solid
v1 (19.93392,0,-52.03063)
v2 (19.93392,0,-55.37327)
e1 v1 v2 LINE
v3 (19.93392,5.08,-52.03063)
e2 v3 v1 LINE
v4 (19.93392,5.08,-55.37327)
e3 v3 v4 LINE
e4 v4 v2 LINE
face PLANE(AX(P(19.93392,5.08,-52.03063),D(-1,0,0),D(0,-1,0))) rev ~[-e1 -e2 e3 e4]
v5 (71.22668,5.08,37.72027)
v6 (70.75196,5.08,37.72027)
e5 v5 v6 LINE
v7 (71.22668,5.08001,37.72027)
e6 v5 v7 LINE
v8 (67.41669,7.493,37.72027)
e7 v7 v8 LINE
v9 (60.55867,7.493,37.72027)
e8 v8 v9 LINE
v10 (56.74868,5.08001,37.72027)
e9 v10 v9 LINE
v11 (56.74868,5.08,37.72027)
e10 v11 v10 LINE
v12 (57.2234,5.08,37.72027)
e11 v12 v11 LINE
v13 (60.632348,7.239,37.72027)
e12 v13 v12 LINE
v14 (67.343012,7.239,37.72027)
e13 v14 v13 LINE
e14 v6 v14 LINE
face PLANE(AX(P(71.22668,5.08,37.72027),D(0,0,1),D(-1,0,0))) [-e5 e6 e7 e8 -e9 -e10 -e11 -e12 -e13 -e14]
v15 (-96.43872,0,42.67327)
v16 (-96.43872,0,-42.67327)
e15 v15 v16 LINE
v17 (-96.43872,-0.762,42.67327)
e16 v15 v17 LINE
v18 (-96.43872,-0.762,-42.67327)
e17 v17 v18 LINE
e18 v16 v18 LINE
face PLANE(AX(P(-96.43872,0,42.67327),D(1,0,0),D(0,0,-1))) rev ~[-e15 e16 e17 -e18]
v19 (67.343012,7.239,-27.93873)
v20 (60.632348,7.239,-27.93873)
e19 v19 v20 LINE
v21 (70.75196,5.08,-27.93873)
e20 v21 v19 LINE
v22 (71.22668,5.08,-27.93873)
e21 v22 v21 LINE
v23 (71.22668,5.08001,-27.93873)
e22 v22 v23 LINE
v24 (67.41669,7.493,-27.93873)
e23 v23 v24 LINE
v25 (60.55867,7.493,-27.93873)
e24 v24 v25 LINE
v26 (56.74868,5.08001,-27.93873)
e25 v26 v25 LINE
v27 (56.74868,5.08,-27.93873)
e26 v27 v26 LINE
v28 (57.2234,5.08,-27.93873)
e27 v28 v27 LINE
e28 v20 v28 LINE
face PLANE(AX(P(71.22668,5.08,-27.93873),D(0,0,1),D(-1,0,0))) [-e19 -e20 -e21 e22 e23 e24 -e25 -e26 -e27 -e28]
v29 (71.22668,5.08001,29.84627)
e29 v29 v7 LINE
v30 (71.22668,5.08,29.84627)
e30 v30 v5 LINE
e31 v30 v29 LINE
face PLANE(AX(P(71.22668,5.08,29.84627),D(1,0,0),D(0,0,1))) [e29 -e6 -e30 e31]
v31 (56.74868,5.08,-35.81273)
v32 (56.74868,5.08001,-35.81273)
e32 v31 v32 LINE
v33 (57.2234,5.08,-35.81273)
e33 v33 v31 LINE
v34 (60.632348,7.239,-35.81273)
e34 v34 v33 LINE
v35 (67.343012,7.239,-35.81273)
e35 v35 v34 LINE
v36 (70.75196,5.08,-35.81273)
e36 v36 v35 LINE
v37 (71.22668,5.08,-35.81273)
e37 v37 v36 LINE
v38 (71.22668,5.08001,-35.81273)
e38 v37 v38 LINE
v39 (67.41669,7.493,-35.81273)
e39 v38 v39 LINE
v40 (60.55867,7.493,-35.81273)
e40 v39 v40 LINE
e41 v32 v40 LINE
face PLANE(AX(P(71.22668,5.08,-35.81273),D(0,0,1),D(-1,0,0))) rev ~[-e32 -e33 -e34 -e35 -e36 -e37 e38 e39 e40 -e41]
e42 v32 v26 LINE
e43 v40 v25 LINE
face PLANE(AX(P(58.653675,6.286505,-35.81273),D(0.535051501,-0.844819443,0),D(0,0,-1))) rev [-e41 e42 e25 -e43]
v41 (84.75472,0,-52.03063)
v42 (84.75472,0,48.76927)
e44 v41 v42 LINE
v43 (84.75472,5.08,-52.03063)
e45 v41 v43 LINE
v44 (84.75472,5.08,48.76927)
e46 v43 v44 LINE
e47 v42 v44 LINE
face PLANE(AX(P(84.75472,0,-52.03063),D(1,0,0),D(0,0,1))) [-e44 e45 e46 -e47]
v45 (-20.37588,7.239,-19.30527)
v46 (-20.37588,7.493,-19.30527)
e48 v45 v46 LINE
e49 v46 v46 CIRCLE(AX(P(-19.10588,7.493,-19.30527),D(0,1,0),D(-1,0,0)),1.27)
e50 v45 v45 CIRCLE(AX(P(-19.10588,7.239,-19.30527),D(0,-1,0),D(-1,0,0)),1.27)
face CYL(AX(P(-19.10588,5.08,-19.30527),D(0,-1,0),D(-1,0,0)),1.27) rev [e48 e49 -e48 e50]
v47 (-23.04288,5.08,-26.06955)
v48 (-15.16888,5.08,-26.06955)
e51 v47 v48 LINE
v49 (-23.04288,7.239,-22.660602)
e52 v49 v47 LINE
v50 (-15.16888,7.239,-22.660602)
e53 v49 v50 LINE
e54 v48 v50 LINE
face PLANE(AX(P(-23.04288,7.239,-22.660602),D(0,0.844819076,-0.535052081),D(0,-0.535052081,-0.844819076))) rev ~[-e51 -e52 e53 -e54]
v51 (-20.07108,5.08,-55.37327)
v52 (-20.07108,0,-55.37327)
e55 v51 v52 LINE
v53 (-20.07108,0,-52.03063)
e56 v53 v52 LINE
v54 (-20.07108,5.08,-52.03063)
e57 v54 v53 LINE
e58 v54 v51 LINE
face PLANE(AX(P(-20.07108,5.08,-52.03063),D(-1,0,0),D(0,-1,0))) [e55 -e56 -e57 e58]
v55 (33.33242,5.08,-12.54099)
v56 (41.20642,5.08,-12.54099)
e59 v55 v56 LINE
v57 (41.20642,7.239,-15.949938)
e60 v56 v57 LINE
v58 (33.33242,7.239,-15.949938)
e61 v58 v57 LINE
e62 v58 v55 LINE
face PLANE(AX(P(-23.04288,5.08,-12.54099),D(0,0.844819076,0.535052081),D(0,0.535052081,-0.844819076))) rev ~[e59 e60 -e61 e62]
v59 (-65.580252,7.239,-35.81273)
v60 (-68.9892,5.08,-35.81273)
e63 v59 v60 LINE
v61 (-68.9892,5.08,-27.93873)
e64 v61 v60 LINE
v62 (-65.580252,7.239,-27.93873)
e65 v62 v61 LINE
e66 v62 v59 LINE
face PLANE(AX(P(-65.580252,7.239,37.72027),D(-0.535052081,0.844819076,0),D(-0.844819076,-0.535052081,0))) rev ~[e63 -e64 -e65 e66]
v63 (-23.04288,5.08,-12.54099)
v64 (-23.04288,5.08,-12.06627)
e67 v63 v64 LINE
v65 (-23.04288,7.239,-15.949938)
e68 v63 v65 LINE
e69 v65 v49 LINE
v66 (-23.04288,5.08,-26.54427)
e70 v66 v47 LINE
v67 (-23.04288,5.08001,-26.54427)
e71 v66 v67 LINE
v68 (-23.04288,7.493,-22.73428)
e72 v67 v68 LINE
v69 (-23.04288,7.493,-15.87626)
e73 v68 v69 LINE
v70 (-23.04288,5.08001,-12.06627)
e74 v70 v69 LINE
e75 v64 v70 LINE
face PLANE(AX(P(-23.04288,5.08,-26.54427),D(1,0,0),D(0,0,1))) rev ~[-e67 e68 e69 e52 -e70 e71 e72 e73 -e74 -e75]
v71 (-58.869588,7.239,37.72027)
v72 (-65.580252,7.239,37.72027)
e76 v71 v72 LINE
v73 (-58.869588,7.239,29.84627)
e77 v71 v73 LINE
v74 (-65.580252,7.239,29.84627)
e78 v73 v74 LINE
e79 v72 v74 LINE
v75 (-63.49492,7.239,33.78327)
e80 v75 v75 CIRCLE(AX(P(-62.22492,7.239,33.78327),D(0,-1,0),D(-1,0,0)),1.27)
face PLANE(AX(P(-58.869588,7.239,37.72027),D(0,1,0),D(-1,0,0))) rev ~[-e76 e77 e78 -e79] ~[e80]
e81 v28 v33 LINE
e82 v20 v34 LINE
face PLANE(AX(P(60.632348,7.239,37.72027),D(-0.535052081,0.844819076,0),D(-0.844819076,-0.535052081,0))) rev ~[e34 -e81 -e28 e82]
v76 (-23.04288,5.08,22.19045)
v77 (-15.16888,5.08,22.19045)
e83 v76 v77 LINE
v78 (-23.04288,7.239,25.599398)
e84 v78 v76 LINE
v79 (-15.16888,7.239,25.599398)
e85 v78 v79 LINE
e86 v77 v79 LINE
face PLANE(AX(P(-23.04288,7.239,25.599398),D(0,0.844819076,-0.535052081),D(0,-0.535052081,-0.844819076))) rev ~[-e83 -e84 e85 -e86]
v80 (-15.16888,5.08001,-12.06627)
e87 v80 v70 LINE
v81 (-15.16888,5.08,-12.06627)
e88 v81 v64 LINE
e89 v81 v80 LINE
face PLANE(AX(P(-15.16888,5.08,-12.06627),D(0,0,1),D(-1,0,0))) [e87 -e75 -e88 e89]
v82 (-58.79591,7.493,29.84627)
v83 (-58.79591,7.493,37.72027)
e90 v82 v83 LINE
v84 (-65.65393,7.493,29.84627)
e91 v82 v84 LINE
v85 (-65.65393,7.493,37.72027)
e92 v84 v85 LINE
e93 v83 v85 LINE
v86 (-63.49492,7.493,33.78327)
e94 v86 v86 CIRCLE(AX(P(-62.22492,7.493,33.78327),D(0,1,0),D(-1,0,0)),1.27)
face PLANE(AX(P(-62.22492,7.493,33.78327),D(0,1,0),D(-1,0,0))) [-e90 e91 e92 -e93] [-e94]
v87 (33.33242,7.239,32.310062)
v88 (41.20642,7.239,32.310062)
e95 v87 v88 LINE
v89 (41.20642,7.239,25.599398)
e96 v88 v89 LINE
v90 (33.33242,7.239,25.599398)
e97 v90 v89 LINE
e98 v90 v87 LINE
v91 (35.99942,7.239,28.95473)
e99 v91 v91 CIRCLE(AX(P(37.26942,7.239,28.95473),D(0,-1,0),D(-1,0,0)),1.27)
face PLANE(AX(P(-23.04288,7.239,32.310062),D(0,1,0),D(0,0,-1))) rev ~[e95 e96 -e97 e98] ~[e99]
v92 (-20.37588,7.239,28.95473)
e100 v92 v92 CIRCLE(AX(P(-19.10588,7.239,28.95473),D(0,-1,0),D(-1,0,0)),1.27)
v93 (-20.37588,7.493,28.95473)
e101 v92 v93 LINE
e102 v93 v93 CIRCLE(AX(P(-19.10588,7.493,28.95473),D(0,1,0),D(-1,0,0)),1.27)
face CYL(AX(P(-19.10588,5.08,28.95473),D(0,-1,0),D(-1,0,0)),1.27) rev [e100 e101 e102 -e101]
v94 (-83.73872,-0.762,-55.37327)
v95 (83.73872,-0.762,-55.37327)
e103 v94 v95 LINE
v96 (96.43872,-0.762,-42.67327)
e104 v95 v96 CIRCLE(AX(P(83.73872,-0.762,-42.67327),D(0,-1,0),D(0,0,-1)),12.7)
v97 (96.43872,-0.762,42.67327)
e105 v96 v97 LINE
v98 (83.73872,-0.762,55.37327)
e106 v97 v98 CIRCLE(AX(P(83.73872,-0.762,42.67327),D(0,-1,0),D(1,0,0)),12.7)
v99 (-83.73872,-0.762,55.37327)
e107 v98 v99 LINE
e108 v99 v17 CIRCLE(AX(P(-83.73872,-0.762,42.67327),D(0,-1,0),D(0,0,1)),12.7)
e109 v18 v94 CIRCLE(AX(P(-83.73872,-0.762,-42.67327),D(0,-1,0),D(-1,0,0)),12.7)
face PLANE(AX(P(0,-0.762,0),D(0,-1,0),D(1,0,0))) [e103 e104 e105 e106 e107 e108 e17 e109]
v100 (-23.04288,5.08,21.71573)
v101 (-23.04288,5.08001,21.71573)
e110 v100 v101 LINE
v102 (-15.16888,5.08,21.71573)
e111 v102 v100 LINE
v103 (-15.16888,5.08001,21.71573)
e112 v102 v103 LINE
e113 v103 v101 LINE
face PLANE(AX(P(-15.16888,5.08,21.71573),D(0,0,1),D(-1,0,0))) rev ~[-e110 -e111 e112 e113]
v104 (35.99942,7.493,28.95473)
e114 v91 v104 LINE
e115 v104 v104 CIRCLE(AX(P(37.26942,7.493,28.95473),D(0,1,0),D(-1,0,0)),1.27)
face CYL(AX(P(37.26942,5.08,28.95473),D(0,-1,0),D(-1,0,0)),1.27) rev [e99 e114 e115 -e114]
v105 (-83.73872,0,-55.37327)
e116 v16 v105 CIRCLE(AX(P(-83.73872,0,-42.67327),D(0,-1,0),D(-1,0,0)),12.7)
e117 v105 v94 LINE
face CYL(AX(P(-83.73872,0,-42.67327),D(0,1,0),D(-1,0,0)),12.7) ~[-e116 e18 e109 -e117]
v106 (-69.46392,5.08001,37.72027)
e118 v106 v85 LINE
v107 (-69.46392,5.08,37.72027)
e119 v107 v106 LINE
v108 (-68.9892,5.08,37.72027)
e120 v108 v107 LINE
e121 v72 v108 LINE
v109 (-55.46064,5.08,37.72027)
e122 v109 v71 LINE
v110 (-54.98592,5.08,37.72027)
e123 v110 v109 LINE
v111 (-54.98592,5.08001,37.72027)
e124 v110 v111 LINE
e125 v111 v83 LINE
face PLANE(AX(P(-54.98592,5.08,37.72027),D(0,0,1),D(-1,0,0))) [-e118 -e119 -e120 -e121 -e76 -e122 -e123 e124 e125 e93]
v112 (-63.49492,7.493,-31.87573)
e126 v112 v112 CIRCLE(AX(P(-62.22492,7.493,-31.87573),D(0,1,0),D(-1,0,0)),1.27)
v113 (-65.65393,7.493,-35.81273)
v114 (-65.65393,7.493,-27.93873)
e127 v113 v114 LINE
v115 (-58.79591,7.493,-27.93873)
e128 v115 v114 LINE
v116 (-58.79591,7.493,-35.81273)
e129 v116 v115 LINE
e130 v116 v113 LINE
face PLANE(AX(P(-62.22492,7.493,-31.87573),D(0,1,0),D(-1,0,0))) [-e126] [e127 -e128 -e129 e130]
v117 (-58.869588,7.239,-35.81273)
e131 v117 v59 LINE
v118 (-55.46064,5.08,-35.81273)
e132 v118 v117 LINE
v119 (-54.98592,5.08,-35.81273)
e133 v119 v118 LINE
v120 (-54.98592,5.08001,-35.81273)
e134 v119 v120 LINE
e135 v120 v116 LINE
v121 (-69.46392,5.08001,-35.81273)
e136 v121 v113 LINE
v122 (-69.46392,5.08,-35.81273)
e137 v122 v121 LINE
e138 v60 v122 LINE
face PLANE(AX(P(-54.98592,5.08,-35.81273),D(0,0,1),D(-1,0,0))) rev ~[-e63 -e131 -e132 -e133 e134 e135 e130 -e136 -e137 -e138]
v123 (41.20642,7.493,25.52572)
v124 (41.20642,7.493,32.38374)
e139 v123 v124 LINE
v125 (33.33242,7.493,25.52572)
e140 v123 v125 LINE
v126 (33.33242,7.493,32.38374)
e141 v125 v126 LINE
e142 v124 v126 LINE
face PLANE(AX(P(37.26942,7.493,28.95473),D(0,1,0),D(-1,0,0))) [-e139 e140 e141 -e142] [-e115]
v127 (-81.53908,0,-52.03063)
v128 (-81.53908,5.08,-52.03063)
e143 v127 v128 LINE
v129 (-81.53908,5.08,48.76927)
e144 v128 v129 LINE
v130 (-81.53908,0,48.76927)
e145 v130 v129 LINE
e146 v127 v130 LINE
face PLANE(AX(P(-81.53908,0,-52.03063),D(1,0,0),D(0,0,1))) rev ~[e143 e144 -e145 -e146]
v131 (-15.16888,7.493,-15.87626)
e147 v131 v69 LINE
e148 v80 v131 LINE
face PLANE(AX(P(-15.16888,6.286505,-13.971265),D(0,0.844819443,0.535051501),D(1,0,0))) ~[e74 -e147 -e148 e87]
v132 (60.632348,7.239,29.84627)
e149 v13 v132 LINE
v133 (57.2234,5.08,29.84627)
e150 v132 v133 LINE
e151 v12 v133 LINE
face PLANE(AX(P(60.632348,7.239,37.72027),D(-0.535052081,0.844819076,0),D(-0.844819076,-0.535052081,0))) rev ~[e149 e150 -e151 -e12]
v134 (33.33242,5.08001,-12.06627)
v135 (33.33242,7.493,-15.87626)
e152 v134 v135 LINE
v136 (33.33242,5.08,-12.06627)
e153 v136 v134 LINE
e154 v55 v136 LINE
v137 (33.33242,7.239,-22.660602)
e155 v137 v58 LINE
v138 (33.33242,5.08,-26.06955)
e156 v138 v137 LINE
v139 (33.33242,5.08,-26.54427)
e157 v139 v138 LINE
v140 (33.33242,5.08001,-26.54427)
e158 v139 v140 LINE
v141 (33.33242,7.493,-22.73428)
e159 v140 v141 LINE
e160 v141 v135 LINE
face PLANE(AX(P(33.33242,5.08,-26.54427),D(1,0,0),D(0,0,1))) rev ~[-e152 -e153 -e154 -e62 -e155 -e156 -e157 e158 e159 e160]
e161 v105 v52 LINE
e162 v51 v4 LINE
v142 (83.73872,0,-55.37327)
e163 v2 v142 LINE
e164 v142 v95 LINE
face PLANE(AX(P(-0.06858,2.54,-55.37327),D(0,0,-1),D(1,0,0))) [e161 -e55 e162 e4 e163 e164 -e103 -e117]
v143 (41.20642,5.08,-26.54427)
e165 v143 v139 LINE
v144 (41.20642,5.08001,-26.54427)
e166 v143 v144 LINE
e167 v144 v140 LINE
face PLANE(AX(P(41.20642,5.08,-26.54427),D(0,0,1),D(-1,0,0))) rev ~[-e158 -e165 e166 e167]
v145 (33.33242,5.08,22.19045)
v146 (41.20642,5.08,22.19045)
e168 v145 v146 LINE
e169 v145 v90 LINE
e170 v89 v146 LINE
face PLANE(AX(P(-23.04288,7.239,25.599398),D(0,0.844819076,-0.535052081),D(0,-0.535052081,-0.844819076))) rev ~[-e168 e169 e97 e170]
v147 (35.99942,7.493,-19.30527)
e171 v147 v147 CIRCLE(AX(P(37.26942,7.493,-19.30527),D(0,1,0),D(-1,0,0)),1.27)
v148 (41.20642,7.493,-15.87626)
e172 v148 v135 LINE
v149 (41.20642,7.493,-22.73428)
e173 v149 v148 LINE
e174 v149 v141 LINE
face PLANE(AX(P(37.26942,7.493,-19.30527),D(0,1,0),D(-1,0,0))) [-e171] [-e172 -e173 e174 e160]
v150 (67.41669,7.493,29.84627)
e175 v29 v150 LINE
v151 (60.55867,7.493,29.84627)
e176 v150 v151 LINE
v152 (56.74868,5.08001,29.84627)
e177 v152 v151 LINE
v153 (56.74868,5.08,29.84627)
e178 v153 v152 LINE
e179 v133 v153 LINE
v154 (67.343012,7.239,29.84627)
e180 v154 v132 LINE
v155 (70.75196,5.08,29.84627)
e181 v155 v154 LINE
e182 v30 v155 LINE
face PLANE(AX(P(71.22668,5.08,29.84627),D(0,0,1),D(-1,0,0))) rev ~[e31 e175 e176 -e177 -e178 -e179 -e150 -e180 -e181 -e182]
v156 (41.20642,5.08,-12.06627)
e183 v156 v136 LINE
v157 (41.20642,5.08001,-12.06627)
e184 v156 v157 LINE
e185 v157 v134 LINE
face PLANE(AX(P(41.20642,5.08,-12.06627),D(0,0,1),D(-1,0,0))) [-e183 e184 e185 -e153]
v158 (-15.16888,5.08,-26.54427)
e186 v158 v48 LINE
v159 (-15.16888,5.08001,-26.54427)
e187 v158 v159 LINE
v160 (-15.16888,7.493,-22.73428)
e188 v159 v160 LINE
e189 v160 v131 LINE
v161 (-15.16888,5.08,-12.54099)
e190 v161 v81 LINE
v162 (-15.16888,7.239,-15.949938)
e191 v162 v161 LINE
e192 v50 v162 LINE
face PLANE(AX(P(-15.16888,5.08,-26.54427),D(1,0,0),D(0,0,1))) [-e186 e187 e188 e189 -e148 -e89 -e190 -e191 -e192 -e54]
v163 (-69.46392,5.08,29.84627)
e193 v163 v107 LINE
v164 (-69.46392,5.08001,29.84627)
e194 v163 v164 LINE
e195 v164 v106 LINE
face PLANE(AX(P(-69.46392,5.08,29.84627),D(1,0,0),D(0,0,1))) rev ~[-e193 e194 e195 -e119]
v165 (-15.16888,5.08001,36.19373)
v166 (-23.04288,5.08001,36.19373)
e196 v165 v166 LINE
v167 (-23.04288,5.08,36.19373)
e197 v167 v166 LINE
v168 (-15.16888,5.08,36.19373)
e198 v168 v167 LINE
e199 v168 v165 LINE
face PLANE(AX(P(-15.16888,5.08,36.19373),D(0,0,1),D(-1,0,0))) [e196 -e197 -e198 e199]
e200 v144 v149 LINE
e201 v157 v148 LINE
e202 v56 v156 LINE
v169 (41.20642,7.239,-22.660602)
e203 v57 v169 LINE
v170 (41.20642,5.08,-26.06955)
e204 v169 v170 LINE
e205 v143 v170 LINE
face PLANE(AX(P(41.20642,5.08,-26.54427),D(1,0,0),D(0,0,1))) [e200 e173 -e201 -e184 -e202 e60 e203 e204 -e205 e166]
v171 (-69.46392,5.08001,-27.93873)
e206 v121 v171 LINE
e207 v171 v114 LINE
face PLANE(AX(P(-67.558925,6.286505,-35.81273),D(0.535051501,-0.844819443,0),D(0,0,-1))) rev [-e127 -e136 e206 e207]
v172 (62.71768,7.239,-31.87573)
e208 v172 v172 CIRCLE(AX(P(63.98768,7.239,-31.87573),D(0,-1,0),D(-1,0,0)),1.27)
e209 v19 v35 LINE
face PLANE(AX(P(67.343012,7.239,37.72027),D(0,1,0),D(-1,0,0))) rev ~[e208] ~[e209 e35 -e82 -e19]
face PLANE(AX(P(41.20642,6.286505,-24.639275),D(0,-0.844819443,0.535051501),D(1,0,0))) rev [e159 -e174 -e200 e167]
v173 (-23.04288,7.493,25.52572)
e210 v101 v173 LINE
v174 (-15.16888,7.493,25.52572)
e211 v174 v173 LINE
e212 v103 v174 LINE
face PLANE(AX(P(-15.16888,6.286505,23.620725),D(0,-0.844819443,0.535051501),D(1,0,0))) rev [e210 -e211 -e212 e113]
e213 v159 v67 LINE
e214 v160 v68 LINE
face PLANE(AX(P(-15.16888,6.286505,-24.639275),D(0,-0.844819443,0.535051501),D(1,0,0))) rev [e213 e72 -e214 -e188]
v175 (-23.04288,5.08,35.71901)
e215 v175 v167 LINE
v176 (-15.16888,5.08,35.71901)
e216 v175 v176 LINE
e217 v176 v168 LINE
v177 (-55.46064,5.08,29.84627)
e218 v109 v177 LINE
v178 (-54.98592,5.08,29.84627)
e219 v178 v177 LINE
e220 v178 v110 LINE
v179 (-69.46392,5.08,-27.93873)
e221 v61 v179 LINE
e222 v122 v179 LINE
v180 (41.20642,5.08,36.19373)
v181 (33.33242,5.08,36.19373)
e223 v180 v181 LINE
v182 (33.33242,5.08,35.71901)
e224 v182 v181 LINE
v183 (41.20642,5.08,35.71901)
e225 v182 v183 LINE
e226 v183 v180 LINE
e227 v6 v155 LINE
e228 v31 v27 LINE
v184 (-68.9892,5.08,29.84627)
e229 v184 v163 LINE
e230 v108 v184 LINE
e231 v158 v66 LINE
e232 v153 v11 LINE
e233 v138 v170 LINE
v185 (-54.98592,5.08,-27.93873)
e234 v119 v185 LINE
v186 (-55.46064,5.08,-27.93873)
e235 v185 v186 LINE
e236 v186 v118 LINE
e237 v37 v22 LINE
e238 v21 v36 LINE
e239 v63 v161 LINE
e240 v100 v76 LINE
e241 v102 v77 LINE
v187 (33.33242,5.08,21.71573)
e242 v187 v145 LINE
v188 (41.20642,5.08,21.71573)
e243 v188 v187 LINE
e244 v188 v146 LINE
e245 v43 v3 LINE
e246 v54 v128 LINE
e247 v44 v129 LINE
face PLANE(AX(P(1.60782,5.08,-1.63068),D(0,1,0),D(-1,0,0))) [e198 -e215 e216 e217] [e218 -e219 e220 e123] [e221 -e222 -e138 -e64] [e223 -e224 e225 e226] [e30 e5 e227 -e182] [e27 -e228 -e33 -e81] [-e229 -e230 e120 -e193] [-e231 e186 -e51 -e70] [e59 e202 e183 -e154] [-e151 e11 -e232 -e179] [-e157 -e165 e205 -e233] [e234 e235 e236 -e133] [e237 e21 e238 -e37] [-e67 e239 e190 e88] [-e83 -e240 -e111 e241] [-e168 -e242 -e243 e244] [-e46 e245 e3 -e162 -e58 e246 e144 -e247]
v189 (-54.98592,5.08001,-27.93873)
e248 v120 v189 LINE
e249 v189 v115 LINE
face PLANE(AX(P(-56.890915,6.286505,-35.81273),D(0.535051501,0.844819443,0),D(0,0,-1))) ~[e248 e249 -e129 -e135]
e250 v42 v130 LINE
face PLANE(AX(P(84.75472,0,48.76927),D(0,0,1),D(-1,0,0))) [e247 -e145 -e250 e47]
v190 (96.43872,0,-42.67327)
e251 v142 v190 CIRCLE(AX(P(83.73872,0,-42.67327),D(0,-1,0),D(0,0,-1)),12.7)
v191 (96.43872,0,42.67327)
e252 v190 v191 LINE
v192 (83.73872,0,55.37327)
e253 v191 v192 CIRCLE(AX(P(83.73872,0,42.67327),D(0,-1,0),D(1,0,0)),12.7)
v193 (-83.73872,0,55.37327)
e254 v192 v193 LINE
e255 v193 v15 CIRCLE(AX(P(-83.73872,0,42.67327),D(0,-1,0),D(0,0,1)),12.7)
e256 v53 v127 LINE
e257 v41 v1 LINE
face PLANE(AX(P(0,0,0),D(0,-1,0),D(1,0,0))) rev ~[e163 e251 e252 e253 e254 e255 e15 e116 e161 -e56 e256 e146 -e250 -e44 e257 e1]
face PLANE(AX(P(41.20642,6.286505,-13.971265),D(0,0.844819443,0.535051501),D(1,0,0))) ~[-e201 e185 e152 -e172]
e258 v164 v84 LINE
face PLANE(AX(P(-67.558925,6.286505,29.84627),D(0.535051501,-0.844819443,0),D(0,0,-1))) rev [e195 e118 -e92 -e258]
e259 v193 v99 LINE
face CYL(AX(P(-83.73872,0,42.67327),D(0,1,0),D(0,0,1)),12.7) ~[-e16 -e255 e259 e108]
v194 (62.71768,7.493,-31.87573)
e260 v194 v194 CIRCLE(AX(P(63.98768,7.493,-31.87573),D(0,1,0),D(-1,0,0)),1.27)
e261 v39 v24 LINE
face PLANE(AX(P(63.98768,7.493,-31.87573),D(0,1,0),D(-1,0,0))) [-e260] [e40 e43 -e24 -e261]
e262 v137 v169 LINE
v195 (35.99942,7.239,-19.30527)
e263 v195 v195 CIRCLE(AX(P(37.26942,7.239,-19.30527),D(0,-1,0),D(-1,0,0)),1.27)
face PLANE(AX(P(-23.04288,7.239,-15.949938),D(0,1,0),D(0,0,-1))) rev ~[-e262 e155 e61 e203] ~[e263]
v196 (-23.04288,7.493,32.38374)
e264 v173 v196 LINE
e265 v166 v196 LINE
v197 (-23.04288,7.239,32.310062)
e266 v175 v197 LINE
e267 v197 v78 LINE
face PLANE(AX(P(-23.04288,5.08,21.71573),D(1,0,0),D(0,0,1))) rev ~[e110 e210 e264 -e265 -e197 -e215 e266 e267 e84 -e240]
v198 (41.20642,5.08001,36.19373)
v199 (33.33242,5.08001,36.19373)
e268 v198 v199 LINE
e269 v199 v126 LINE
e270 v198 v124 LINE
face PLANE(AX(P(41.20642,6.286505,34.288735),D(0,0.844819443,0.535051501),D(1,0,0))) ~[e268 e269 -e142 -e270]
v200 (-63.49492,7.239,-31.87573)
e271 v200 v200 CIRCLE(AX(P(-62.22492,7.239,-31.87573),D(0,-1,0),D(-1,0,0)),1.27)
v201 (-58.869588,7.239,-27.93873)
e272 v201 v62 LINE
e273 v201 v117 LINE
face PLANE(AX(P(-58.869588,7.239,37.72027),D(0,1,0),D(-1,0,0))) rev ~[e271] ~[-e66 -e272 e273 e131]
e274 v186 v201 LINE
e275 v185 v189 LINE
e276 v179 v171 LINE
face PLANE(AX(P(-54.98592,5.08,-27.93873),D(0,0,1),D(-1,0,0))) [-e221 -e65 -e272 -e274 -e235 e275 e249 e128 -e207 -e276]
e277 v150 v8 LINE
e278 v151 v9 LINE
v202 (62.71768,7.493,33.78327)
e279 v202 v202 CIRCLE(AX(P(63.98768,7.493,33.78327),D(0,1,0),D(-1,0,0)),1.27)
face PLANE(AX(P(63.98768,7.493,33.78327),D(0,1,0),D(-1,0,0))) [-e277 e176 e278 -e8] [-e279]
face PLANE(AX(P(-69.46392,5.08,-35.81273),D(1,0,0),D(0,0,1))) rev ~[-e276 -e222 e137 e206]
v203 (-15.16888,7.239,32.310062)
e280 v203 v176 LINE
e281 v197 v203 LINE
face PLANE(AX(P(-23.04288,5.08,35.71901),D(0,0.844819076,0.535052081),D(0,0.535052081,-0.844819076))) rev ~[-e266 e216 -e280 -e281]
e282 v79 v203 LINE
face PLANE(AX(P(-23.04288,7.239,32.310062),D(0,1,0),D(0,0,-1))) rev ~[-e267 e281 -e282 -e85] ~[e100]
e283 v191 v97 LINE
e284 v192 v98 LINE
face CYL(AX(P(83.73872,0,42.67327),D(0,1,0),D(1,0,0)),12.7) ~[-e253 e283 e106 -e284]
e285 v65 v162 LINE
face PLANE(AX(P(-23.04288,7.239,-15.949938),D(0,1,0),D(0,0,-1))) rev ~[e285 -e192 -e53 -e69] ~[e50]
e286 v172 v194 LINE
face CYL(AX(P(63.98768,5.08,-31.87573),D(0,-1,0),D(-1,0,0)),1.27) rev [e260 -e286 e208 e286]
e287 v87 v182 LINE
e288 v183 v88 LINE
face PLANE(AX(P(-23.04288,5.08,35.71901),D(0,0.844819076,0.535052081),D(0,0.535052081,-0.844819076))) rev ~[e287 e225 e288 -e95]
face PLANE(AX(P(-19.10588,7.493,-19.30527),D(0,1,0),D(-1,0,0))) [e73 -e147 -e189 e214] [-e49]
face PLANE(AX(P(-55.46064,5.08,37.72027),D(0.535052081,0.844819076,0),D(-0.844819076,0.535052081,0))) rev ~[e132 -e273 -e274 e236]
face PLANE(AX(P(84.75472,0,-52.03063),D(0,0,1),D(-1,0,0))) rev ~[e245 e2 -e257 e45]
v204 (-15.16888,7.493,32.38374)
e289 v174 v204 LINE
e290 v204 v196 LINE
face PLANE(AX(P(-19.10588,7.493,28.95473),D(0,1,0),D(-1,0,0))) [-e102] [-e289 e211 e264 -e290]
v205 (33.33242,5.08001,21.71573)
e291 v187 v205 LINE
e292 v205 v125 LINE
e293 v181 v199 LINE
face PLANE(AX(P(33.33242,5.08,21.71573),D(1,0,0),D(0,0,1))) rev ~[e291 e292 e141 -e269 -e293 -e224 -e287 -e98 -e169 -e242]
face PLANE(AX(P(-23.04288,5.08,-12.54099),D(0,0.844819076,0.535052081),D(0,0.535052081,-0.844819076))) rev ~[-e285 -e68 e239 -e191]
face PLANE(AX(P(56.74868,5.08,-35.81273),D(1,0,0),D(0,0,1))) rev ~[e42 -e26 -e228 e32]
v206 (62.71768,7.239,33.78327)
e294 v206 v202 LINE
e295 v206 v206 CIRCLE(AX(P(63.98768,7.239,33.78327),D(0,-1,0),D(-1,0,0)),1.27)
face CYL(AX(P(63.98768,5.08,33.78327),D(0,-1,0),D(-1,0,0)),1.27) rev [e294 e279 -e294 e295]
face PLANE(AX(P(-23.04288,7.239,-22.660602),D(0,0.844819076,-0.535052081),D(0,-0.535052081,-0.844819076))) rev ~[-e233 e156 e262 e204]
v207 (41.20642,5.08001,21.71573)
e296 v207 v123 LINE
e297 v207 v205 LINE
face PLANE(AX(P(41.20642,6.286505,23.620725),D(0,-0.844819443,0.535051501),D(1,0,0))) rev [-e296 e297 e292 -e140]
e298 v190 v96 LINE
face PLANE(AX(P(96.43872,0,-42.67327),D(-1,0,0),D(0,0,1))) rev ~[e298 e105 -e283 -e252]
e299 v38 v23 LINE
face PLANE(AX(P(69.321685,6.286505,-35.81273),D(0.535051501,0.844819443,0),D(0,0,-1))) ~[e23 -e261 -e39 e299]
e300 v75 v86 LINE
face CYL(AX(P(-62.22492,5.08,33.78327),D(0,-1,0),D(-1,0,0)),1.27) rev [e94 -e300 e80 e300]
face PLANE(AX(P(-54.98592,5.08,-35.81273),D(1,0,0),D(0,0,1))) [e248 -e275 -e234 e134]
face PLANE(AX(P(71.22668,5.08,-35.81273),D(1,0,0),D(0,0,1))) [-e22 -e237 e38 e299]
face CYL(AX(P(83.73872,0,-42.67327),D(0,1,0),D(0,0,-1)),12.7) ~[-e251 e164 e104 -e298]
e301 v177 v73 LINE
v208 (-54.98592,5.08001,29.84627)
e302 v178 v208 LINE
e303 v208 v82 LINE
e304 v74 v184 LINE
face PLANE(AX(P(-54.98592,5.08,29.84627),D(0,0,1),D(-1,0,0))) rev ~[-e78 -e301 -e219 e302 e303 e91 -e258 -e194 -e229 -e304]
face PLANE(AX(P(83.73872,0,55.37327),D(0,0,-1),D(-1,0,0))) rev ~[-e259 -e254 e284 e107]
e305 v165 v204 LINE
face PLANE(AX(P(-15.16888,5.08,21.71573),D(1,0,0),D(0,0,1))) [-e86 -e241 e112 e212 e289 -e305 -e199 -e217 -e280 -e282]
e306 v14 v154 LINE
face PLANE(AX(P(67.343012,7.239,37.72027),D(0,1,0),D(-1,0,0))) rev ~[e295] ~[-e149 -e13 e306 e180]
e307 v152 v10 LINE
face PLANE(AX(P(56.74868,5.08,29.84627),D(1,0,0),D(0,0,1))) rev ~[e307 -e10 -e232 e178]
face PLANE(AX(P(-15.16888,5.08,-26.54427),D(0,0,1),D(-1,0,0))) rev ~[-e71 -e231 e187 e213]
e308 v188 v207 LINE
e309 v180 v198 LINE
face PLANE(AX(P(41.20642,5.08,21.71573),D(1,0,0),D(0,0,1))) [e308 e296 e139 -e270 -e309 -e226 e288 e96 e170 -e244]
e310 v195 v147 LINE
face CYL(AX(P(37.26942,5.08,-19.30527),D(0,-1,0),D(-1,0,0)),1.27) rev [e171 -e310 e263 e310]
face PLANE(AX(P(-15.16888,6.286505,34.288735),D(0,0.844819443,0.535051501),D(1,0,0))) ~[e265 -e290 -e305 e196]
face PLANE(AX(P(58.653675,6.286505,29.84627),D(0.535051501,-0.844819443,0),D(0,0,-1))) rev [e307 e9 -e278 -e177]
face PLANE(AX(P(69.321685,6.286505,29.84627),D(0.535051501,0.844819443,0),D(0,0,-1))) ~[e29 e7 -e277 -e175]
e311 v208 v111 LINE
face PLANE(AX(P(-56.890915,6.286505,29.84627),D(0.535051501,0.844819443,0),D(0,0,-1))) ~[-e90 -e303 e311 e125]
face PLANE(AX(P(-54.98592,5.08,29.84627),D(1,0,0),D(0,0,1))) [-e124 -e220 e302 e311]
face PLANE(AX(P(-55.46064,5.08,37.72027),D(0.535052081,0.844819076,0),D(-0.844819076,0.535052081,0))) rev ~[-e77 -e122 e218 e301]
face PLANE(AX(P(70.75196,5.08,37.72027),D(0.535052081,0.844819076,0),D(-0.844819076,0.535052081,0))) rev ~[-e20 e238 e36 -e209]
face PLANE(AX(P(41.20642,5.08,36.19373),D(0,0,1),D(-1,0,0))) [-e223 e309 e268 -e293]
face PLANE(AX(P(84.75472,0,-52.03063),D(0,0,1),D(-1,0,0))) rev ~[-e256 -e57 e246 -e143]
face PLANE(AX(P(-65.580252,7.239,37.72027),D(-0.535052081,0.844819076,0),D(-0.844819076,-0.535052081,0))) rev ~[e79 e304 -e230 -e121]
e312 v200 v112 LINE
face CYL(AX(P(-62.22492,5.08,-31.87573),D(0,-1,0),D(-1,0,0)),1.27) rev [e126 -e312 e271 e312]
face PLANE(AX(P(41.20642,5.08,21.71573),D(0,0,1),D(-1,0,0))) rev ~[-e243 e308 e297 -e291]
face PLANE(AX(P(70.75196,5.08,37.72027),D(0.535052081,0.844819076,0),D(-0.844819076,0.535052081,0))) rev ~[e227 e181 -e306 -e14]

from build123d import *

# Parameters (mm, degrees)
F1_DEPTH   = 0.762
F2_W       = 166.2938
F2_H       = 100.7999
F3_DEPTH   = 5.08
F4_W       = 14.478
F4_H       = 7.874
F4_R       = 1.27
F4_W_2     = 7.874
F4_H_2     = 14.478
F5_DEPTH   = 2.413
F6_SIZE2   = 3.80999
F6_SIZE    = 2.41299
F6_2_SIZE2 = 3.80999
F6_2_SIZE  = 2.41299
F6_3_SIZE2 = 3.80999
F6_3_SIZE  = 2.41299
F6_4_SIZE2 = 3.80999
F6_4_SIZE  = 2.41299
F6_5_SIZE2 = 3.80999
F6_5_SIZE  = 2.41299
F6_6_SIZE2 = 3.80999
F6_6_SIZE  = 2.41299
F6_7_SIZE2 = 3.80999
F6_7_SIZE  = 2.41299
F6_8_SIZE2 = 3.80999
F6_8_SIZE  = 2.41299
F6_9_SIZE2 = 3.80999
F6_9_SIZE  = 2.41299
F7_SIZE2   = 3.80999
F7_SIZE    = 2.41299
F7_2_SIZE2 = 3.80999
F7_2_SIZE  = 2.41299
F7_3_SIZE2 = 3.80999
F7_3_SIZE  = 2.41299
F7_4_SIZE2 = 3.80999
F7_4_SIZE  = 2.41299
F7_5_SIZE2 = 3.80999
F7_5_SIZE  = 2.41299
F7_6_SIZE2 = 3.80999
F7_6_SIZE  = 2.41299
F7_7_SIZE2 = 3.80999
F7_7_SIZE  = 2.41299
F9_DEPTH   = 73.533
F11_DEPTH  = 64.2493
F12_W      = 40.005
F12_H      = 5.08
F13_DEPTH  = 3.34264


# Not quite as in the source:
# - a fillet or chamfer is up to 0.001 mm smaller than in the source, because OpenCascade refuses the exact size


with BuildPart() as f1:
    # F0 (on Front) → F1 (new body)
    with BuildSketch(Plane.XZ):
        with BuildLine():
            ThreePointArc((96.43872, 42.67327), (92.7189761211, 51.6535261211), (83.73872, 55.37327))
            Line((83.73872, 55.37327), (-83.73872, 55.37327))
            ThreePointArc((-83.73872, 55.37327), (-92.7189761211, 51.6535261211), (-96.43872, 42.67327))
            Line((-96.43872, 42.67327), (-96.43872, -42.67327))
            ThreePointArc((-96.43872, -42.67327), (-92.7189761211, -51.6535261211), (-83.73872, -55.37327))
            Line((-83.73872, -55.37327), (83.73872, -55.37327))
            ThreePointArc((83.73872, -55.37327), (92.7189761211, -51.6535261211), (96.43872, -42.67327))
            Line((96.43872, -42.67327), (96.43872, 42.67327))
        make_face()
    extrude(amount=F1_DEPTH)

    # F2 (on face) → F3 (join)
    with BuildSketch(Plane(origin=(0, 0, 0), x_dir=(-1, 0, 0), z_dir=(0, 1, 0))):
        with Locations((-1.60782, -1.63068)):
            Rectangle(F2_W, F2_H)
    extrude(amount=F3_DEPTH)

    # F4 (on face) → F5 (join)
    with BuildSketch(Plane(origin=(0, 5.08, 0), x_dir=(-1, 0, 0), z_dir=(0, 1, 0))):
        with Locations((-63.98768, 33.78327)):
            Rectangle(F4_W, F4_H)
        with Locations((-63.98768, 33.78327)):
            Circle(F4_R, mode=Mode.SUBTRACT)
        with Locations((-63.98768, -31.87573)):
            Rectangle(F4_W, F4_H)
        with Locations((-63.98768, -31.87573)):
            Circle(F4_R, mode=Mode.SUBTRACT)
        with Locations((62.22492, 33.78327)):
            Rectangle(F4_W, F4_H)
        with Locations((62.22492, 33.78327)):
            Circle(F4_R, mode=Mode.SUBTRACT)
        with Locations((62.22492, -31.87573)):
            Rectangle(F4_W, F4_H)
        with Locations((62.22492, -31.87573)):
            Circle(F4_R, mode=Mode.SUBTRACT)
        with Locations((-37.26942, 28.95473)):
            Rectangle(F4_W_2, F4_H_2)
        with Locations((-37.26942, 28.95473)):
            Circle(F4_R, mode=Mode.SUBTRACT)
        with Locations((19.10588, 28.95473)):
            Rectangle(F4_W_2, F4_H_2)
        with Locations((19.10588, 28.95473)):
            Circle(F4_R, mode=Mode.SUBTRACT)
        with Locations((-37.26942, -19.30527)):
            Rectangle(F4_W_2, F4_H_2)
        with Locations((-37.26942, -19.30527)):
            Circle(F4_R, mode=Mode.SUBTRACT)
        with Locations((19.10588, -19.30527)):
            Rectangle(F4_W_2, F4_H_2)
        with Locations((19.10588, -19.30527)):
            Circle(F4_R, mode=Mode.SUBTRACT)
    extrude(amount=F5_DEPTH)

    # F6 (size 2.413 and 3.81 in the source; OpenCascade refuses exactly that, so slightly less here)
    f6_edges = [f1.edges().sort_by_distance(p)[0] for p in [
        (56.74868, 7.493, 33.78327),
    ]]
    f6_side = f1.faces().sort_by_distance((56.74868, 6.2865, 33.78327))[0]
    chamfer(f6_edges, length=F6_SIZE, length2=F6_SIZE2, reference=f6_side)

    # F6#2 (size 2.413 and 3.81 in the source; OpenCascade refuses exactly that, so slightly less here)
    f6_2_edges = [f1.edges().sort_by_distance(p)[0] for p in [
        (71.22668, 7.493, 33.78327),
    ]]
    f6_2_side = f1.faces().sort_by_distance((71.22668, 6.2865, 33.78327))[0]
    chamfer(f6_2_edges, length=F6_2_SIZE, length2=F6_2_SIZE2, reference=f6_2_side)

    # F6#3 (size 2.413 and 3.81 in the source; OpenCascade refuses exactly that, so slightly less here)
    f6_3_edges = [f1.edges().sort_by_distance(p)[0] for p in [
        (56.74868, 7.493, -31.87573),
    ]]
    f6_3_side = f1.faces().sort_by_distance((56.74868, 6.2865, -31.87573))[0]
    chamfer(f6_3_edges, length=F6_3_SIZE, length2=F6_3_SIZE2, reference=f6_3_side)

    # F6#4 (size 2.413 and 3.81 in the source; OpenCascade refuses exactly that, so slightly less here)
    f6_4_edges = [f1.edges().sort_by_distance(p)[0] for p in [
        (37.26942, 7.493, -26.54427),
    ]]
    f6_4_side = f1.faces().sort_by_distance((37.26942, 6.2865, -26.54427))[0]
    chamfer(f6_4_edges, length=F6_4_SIZE, length2=F6_4_SIZE2, reference=f6_4_side)

    # F6#5 (size 2.413 and 3.81 in the source; OpenCascade refuses exactly that, so slightly less here)
    f6_5_edges = [f1.edges().sort_by_distance(p)[0] for p in [
        (37.26942, 7.493, 21.71573),
    ]]
    f6_5_side = f1.faces().sort_by_distance((37.26942, 6.2865, 21.71573))[0]
    chamfer(f6_5_edges, length=F6_5_SIZE, length2=F6_5_SIZE2, reference=f6_5_side)

    # F6#6 (size 2.413 and 3.81 in the source; OpenCascade refuses exactly that, so slightly less here)
    f6_6_edges = [f1.edges().sort_by_distance(p)[0] for p in [
        (-19.10588, 7.493, -26.54427),
    ]]
    f6_6_side = f1.faces().sort_by_distance((-19.10588, 6.2865, -26.54427))[0]
    chamfer(f6_6_edges, length=F6_6_SIZE, length2=F6_6_SIZE2, reference=f6_6_side)

    # F6#7 (size 2.413 and 3.81 in the source; OpenCascade refuses exactly that, so slightly less here)
    f6_7_edges = [f1.edges().sort_by_distance(p)[0] for p in [
        (-19.10588, 7.493, 21.71573),
    ]]
    f6_7_side = f1.faces().sort_by_distance((-19.10588, 6.2865, 21.71573))[0]
    chamfer(f6_7_edges, length=F6_7_SIZE, length2=F6_7_SIZE2, reference=f6_7_side)

    # F6#8 (size 2.413 and 3.81 in the source; OpenCascade refuses exactly that, so slightly less here)
    f6_8_edges = [f1.edges().sort_by_distance(p)[0] for p in [
        (-69.46392, 7.493, 33.78327),
    ]]
    f6_8_side = f1.faces().sort_by_distance((-69.46392, 6.2865, 33.78327))[0]
    chamfer(f6_8_edges, length=F6_8_SIZE, length2=F6_8_SIZE2, reference=f6_8_side)

    # F6#9 (size 2.413 and 3.81 in the source; OpenCascade refuses exactly that, so slightly less here)
    f6_9_edges = [f1.edges().sort_by_distance(p)[0] for p in [
        (-69.46392, 7.493, -31.87573),
    ]]
    f6_9_side = f1.faces().sort_by_distance((-69.46392, 6.2865, -31.87573))[0]
    chamfer(f6_9_edges, length=F6_9_SIZE, length2=F6_9_SIZE2, reference=f6_9_side)

    # F7 (size 2.413 and 3.81 in the source; OpenCascade refuses exactly that, so slightly less here)
    f7_edges = [f1.edges().sort_by_distance(p)[0] for p in [
        (37.26942, 7.493, 36.19373),
    ]]
    f7_side = f1.faces().sort_by_distance((37.26942, 6.2865, 36.19373))[0]
    chamfer(f7_edges, length=F7_SIZE, length2=F7_SIZE2, reference=f7_side)

    # F7#2 (size 2.413 and 3.81 in the source; OpenCascade refuses exactly that, so slightly less here)
    f7_2_edges = [f1.edges().sort_by_distance(p)[0] for p in [
        (71.22668, 7.493, -31.87573),
    ]]
    f7_2_side = f1.faces().sort_by_distance((71.22668, 6.2865, -31.87573))[0]
    chamfer(f7_2_edges, length=F7_2_SIZE, length2=F7_2_SIZE2, reference=f7_2_side)

    # F7#3 (size 2.413 and 3.81 in the source; OpenCascade refuses exactly that, so slightly less here)
    f7_3_edges = [f1.edges().sort_by_distance(p)[0] for p in [
        (37.26942, 7.493, -12.06627),
    ]]
    f7_3_side = f1.faces().sort_by_distance((37.26942, 6.2865, -12.06627))[0]
    chamfer(f7_3_edges, length=F7_3_SIZE, length2=F7_3_SIZE2, reference=f7_3_side)

    # F7#4 (size 2.413 and 3.81 in the source; OpenCascade refuses exactly that, so slightly less here)
    f7_4_edges = [f1.edges().sort_by_distance(p)[0] for p in [
        (-19.10588, 7.493, -12.06627),
    ]]
    f7_4_side = f1.faces().sort_by_distance((-19.10588, 6.2865, -12.06627))[0]
    chamfer(f7_4_edges, length=F7_4_SIZE, length2=F7_4_SIZE2, reference=f7_4_side)

    # F7#5 (size 2.413 and 3.81 in the source; OpenCascade refuses exactly that, so slightly less here)
    f7_5_edges = [f1.edges().sort_by_distance(p)[0] for p in [
        (-19.10588, 7.493, 36.19373),
    ]]
    f7_5_side = f1.faces().sort_by_distance((-19.10588, 6.2865, 36.19373))[0]
    chamfer(f7_5_edges, length=F7_5_SIZE, length2=F7_5_SIZE2, reference=f7_5_side)

    # F7#6 (size 2.413 and 3.81 in the source; OpenCascade refuses exactly that, so slightly less here)
    f7_6_edges = [f1.edges().sort_by_distance(p)[0] for p in [
        (-54.98592, 7.493, 33.78327),
    ]]
    f7_6_side = f1.faces().sort_by_distance((-54.98592, 6.2865, 33.78327))[0]
    chamfer(f7_6_edges, length=F7_6_SIZE, length2=F7_6_SIZE2, reference=f7_6_side)

    # F7#7 (size 2.413 and 3.81 in the source; OpenCascade refuses exactly that, so slightly less here)
    f7_7_edges = [f1.edges().sort_by_distance(p)[0] for p in [
        (-54.98592, 7.493, -31.87573),
    ]]
    f7_7_side = f1.faces().sort_by_distance((-54.98592, 6.2865, -31.87573))[0]
    chamfer(f7_7_edges, length=F7_7_SIZE, length2=F7_7_SIZE2, reference=f7_7_side)

    # F8 (on face) → F9 (cut, through all)
    with BuildSketch(Plane.XY.offset(37.72027)):
        Polygon((-65.5802524895, 7.239), (-68.9891998579, 5.08), (-55.4606401421, 5.08), (-58.8695875105, 7.239), align=None)
        Polygon((60.6323475105, 7.239), (57.2234001421, 5.08), (70.7519598579, 5.08), (67.3430124895, 7.239), align=None)
    extrude(amount=-F9_DEPTH, mode=Mode.SUBTRACT)

    # F10 (on face) → F11 (cut, through all)
    with BuildSketch(Plane(origin=(-23.04288, 0, 0), x_dir=(0, -1, 0), z_dir=(-1, 0, 0))):
        Polygon((-7.239, -22.6606024895), (-5.08, -26.0695498579), (-5.08, -12.5409901421), (-7.239, -15.9499375105), align=None)
        Polygon((-7.239, 25.5993975105), (-5.08, 22.1904501421), (-5.08, 35.7190098579), (-7.239, 32.3100624895), align=None)
    extrude(amount=-F11_DEPTH, mode=Mode.SUBTRACT)

    # F12 (on face) → F13 (join, through all)
    with BuildSketch(Plane(origin=(0, 0, -52.03063), x_dir=(1, 0, 0), z_dir=(0, 0, -1))):
        with Locations((-0.06858, -2.54)):
            Rectangle(F12_W, F12_H)
    extrude(amount=F13_DEPTH)


solid = f1.part
